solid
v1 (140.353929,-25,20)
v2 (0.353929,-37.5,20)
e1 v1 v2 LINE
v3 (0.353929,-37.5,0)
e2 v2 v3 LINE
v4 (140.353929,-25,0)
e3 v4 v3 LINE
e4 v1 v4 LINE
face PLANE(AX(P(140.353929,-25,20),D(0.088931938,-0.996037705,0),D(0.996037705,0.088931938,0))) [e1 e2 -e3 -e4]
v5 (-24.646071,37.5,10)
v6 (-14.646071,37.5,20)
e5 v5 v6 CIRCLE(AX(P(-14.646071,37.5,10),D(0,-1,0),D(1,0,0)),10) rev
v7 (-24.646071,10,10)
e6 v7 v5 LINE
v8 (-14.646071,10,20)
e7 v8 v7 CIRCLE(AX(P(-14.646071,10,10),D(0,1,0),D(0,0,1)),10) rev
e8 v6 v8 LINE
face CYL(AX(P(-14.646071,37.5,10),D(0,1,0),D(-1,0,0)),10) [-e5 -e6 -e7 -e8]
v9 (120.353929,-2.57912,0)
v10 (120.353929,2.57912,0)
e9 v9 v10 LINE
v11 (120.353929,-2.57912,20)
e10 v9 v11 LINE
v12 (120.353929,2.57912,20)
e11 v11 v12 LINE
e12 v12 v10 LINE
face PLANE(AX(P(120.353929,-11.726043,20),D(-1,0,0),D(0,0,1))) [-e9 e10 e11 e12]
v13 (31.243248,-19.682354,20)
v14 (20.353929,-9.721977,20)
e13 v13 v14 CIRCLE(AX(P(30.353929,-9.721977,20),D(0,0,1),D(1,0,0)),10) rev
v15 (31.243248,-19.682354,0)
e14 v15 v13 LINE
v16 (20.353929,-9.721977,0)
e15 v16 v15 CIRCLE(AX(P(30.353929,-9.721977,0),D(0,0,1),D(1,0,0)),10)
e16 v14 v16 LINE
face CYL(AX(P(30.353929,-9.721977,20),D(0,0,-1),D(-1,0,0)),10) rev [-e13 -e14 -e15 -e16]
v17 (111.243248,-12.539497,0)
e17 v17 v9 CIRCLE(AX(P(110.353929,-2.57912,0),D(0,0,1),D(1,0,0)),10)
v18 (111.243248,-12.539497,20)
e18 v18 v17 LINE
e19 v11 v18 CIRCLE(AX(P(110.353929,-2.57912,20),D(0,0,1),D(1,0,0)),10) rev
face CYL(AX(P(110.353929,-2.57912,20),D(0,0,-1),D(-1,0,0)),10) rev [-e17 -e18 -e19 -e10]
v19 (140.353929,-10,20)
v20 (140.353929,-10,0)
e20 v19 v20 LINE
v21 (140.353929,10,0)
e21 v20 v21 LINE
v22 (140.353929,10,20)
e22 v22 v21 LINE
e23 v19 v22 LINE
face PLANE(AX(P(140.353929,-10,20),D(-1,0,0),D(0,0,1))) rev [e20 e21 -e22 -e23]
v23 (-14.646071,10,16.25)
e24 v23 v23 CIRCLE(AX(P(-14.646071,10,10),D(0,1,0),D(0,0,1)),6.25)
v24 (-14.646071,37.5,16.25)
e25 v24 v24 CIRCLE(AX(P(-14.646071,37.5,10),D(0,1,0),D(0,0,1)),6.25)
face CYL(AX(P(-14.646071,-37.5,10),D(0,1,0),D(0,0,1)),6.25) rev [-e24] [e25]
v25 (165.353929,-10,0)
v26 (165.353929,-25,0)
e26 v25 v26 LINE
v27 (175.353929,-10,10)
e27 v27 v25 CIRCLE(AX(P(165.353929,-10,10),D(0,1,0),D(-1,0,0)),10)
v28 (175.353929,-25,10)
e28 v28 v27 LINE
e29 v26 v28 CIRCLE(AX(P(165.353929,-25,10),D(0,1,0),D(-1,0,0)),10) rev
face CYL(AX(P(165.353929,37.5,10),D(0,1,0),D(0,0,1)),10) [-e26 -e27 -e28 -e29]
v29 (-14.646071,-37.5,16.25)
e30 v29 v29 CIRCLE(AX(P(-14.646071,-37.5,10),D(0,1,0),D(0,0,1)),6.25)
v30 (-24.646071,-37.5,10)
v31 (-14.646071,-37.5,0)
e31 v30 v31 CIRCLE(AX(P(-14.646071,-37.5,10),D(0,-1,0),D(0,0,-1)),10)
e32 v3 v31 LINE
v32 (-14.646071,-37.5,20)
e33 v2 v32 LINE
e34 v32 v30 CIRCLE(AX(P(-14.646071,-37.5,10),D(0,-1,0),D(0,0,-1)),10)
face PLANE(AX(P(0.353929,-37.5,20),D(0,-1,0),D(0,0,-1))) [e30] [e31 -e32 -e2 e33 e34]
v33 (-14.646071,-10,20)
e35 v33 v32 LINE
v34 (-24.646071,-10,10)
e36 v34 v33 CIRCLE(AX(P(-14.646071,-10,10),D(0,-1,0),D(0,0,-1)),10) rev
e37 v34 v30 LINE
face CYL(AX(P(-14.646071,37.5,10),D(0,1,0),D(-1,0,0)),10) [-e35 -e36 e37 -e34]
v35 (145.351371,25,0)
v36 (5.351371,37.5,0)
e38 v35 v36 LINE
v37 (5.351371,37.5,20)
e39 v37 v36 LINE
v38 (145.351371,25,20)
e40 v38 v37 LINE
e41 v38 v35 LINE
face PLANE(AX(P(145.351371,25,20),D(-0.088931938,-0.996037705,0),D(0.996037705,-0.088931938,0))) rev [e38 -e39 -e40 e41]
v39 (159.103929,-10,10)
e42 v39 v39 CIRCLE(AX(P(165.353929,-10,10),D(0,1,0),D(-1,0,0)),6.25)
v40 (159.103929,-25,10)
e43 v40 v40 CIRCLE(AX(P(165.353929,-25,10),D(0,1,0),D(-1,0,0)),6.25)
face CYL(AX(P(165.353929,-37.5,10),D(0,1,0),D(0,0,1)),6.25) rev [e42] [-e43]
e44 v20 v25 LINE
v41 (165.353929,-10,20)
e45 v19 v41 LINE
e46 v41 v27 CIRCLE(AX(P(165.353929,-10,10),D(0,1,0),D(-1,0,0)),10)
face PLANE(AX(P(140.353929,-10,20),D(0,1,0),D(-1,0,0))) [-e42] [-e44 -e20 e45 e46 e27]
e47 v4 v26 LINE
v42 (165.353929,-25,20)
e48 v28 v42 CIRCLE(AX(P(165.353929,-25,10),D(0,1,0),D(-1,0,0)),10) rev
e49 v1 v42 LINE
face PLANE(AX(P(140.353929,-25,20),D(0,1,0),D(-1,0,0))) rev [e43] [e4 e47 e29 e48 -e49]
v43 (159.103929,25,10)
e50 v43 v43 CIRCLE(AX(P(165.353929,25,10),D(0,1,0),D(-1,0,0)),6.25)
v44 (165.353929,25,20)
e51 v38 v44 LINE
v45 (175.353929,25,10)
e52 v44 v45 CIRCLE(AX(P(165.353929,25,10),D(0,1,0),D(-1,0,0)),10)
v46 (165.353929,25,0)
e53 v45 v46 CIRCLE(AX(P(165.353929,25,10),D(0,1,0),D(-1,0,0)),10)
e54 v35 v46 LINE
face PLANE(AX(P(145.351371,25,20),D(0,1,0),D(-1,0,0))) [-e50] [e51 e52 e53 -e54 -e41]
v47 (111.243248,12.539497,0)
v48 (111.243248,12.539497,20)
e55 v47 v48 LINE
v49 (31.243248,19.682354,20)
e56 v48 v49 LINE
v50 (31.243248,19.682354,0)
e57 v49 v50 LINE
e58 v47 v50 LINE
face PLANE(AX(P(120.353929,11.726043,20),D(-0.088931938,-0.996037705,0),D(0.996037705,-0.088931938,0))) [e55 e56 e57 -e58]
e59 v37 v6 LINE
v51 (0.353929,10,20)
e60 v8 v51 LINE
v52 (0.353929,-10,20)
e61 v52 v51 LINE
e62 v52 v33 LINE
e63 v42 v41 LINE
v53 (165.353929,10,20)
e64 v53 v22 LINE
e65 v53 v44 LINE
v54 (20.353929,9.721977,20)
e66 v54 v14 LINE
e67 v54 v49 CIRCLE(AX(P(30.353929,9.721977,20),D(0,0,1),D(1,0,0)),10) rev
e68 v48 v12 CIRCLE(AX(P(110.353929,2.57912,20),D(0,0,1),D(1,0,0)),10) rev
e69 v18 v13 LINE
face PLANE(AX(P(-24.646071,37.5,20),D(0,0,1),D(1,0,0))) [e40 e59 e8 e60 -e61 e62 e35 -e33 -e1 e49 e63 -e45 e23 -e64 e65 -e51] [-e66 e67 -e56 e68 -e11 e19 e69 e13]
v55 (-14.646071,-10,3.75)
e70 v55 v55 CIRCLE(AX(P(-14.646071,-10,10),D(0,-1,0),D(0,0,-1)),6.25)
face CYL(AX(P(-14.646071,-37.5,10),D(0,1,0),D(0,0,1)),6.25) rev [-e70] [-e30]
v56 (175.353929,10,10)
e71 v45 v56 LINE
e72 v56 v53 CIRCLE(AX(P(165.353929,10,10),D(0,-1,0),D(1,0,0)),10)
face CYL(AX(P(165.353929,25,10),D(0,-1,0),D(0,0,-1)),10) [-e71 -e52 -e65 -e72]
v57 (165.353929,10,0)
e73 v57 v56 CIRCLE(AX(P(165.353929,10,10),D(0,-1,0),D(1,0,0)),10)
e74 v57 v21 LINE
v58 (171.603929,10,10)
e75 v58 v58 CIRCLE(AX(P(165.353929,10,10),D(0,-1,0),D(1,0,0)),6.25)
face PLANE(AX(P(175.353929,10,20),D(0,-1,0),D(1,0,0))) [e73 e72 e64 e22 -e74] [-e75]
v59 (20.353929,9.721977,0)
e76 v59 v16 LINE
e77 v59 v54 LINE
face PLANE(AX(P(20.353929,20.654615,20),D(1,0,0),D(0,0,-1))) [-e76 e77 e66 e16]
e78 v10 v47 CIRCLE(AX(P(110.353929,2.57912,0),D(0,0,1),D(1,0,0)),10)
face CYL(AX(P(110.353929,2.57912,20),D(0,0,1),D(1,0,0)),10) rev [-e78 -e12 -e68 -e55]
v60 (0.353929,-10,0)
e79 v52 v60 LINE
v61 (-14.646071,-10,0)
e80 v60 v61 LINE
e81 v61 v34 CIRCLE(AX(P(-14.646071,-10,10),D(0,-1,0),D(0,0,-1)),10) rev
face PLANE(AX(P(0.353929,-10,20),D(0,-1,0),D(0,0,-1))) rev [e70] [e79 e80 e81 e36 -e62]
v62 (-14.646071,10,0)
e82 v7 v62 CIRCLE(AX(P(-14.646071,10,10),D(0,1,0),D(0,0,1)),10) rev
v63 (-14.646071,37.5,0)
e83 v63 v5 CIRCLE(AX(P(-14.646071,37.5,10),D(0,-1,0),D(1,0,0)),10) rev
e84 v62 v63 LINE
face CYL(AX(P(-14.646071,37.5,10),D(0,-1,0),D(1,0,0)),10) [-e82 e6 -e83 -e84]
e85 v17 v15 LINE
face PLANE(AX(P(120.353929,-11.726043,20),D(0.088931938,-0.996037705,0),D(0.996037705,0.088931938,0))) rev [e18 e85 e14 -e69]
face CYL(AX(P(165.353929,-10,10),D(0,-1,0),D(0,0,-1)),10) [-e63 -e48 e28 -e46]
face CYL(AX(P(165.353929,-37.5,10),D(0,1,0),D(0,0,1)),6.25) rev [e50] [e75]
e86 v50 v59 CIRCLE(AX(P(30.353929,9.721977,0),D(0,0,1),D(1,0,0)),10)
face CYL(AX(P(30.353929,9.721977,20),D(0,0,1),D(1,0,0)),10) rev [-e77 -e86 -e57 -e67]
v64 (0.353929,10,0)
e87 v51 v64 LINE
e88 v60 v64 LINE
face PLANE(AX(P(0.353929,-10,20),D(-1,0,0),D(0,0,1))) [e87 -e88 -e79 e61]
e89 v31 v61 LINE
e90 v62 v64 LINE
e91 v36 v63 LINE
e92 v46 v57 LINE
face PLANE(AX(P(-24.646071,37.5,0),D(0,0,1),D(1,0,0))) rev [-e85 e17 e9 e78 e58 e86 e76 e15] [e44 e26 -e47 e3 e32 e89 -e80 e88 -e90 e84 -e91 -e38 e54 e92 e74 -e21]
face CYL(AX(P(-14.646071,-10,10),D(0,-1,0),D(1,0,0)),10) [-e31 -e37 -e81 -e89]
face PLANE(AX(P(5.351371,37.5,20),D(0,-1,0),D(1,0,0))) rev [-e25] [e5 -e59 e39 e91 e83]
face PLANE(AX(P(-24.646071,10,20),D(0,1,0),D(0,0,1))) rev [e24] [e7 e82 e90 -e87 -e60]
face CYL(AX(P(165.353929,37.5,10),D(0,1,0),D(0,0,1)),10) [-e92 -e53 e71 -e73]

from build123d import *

# Parameters (mm, degrees)
BASE_EXTRUDE_DEPTH      = 20
FILLET1_R               = 10
FILLET2_R               = 10
CUT_EXTRUDE1_DEPTH      = 181.430735794
CUT_EXTRUDE1_DEPTH_BACK = 181.430735794
SKETCH4_R               = 6.25


with BuildPart() as part:
    # Sketch1 → Base-Extrude (new body)
    with BuildSketch(Plane.XY):
        Polygon((145.351370521, 25), (5.351370521, 37.5), (-24.64607099, 37.5), (-24.64607099, 10), (0.35392901, 10), (0.35392901, -10), (-24.64607099, -10), (-24.64607099, -37.5), (0.35392901, -37.5), (140.35392901, -25), (175.35392901, -25), (175.35392901, -10), (140.35392901, -10), (140.35392901, 10), (175.35392901, 10), (175.35392901, 25), align=None)
        Polygon((120.35392901, 11.726043432), (20.35392901, 20.65461486), (20.35392901, -20.65461486), (120.35392901, -11.726043432), align=None, mode=Mode.SUBTRACT)
    extrude(amount=BASE_EXTRUDE_DEPTH)

    # Fillet1
    # the kernel refuses this fillet: 10 mm, written as the material it takes off along each edge
    with BuildSketch(Plane(origin=(175.35392901, -15, 0), x_dir=(0, 0, 1), z_dir=(0, 1, 0)), Plane(origin=(175.35392901, -50, 0), x_dir=(0, 0, 1), z_dir=(0, 1, 0))) as fillet1_piece_1:
        with BuildLine():
            CenterArc((FILLET1_R, -FILLET1_R), FILLET1_R, 90, 90)
            Line((0, -FILLET1_R), (0, 0))
            Line((0, 0), (FILLET1_R, 0))
        make_face()
    extrude(amount=65, mode=Mode.SUBTRACT)
    with BuildSketch(Plane(origin=(-24.64607099, 15, 0), x_dir=(0, 0, 1), z_dir=(0, -1, 0)), Plane(origin=(-24.64607099, 62.5, 0), x_dir=(0, 0, 1), z_dir=(0, -1, 0))) as fillet1_piece_2:
        with BuildLine():
            CenterArc((FILLET1_R, -FILLET1_R), FILLET1_R, 90, 90)
            Line((0, -FILLET1_R), (0, 0))
            Line((0, 0), (FILLET1_R, 0))
        make_face()
    extrude(amount=77.5, mode=Mode.SUBTRACT)
    with BuildSketch(Plane(origin=(-24.64607099, 15, 20), x_dir=(0, 0, -1), z_dir=(0, -1, 0)), Plane(origin=(-24.64607099, 62.5, 20), x_dir=(0, 0, -1), z_dir=(0, -1, 0))) as fillet1_piece_3:
        with BuildLine():
            CenterArc((FILLET1_R, FILLET1_R), FILLET1_R, 180, 90)
            Line((0, FILLET1_R), (0, 0))
            Line((0, 0), (FILLET1_R, 0))
        make_face()
    extrude(amount=77.5, mode=Mode.SUBTRACT)
    with BuildSketch(Plane(origin=(175.35392901, -50, 20), x_dir=(0, 0, -1), z_dir=(0, 1, 0)), Plane(origin=(175.35392901, -15, 20), x_dir=(0, 0, -1), z_dir=(0, 1, 0))) as fillet1_piece_4:
        with BuildLine():
            CenterArc((FILLET1_R, FILLET1_R), FILLET1_R, 180, 90)
            Line((0, FILLET1_R), (0, 0))
            Line((0, 0), (FILLET1_R, 0))
        make_face()
    extrude(amount=65, mode=Mode.SUBTRACT)

    # Fillet2
    fillet2_edges = [part.edges().sort_by_distance(p)[0] for p in [
        (120.35392901, -11.726043432, 10),
        (120.35392901, 11.726043432, 10),
        (20.35392901, 20.65461486, 10),
        (20.35392901, -20.65461486, 10),
    ]]
    fillet(fillet2_edges, radius=FILLET2_R)

    # Sketch4 → Cut-Extrude1 (cut, two sides: drawn at the far end of the back side and taken through both)
    with BuildSketch(Plane(origin=(0, 0, 0), x_dir=(1, 0, 0), z_dir=(0, 1, 0)).offset(-CUT_EXTRUDE1_DEPTH_BACK)):
        with Locations((165.35392901, -10)):
            Circle(SKETCH4_R)
        with Locations(Location((-14.64607099, -10, 0), (0, 0, 270))):
            Circle(SKETCH4_R)
    extrude(amount=CUT_EXTRUDE1_DEPTH + CUT_EXTRUDE1_DEPTH_BACK, mode=Mode.SUBTRACT)


solid = part.part
